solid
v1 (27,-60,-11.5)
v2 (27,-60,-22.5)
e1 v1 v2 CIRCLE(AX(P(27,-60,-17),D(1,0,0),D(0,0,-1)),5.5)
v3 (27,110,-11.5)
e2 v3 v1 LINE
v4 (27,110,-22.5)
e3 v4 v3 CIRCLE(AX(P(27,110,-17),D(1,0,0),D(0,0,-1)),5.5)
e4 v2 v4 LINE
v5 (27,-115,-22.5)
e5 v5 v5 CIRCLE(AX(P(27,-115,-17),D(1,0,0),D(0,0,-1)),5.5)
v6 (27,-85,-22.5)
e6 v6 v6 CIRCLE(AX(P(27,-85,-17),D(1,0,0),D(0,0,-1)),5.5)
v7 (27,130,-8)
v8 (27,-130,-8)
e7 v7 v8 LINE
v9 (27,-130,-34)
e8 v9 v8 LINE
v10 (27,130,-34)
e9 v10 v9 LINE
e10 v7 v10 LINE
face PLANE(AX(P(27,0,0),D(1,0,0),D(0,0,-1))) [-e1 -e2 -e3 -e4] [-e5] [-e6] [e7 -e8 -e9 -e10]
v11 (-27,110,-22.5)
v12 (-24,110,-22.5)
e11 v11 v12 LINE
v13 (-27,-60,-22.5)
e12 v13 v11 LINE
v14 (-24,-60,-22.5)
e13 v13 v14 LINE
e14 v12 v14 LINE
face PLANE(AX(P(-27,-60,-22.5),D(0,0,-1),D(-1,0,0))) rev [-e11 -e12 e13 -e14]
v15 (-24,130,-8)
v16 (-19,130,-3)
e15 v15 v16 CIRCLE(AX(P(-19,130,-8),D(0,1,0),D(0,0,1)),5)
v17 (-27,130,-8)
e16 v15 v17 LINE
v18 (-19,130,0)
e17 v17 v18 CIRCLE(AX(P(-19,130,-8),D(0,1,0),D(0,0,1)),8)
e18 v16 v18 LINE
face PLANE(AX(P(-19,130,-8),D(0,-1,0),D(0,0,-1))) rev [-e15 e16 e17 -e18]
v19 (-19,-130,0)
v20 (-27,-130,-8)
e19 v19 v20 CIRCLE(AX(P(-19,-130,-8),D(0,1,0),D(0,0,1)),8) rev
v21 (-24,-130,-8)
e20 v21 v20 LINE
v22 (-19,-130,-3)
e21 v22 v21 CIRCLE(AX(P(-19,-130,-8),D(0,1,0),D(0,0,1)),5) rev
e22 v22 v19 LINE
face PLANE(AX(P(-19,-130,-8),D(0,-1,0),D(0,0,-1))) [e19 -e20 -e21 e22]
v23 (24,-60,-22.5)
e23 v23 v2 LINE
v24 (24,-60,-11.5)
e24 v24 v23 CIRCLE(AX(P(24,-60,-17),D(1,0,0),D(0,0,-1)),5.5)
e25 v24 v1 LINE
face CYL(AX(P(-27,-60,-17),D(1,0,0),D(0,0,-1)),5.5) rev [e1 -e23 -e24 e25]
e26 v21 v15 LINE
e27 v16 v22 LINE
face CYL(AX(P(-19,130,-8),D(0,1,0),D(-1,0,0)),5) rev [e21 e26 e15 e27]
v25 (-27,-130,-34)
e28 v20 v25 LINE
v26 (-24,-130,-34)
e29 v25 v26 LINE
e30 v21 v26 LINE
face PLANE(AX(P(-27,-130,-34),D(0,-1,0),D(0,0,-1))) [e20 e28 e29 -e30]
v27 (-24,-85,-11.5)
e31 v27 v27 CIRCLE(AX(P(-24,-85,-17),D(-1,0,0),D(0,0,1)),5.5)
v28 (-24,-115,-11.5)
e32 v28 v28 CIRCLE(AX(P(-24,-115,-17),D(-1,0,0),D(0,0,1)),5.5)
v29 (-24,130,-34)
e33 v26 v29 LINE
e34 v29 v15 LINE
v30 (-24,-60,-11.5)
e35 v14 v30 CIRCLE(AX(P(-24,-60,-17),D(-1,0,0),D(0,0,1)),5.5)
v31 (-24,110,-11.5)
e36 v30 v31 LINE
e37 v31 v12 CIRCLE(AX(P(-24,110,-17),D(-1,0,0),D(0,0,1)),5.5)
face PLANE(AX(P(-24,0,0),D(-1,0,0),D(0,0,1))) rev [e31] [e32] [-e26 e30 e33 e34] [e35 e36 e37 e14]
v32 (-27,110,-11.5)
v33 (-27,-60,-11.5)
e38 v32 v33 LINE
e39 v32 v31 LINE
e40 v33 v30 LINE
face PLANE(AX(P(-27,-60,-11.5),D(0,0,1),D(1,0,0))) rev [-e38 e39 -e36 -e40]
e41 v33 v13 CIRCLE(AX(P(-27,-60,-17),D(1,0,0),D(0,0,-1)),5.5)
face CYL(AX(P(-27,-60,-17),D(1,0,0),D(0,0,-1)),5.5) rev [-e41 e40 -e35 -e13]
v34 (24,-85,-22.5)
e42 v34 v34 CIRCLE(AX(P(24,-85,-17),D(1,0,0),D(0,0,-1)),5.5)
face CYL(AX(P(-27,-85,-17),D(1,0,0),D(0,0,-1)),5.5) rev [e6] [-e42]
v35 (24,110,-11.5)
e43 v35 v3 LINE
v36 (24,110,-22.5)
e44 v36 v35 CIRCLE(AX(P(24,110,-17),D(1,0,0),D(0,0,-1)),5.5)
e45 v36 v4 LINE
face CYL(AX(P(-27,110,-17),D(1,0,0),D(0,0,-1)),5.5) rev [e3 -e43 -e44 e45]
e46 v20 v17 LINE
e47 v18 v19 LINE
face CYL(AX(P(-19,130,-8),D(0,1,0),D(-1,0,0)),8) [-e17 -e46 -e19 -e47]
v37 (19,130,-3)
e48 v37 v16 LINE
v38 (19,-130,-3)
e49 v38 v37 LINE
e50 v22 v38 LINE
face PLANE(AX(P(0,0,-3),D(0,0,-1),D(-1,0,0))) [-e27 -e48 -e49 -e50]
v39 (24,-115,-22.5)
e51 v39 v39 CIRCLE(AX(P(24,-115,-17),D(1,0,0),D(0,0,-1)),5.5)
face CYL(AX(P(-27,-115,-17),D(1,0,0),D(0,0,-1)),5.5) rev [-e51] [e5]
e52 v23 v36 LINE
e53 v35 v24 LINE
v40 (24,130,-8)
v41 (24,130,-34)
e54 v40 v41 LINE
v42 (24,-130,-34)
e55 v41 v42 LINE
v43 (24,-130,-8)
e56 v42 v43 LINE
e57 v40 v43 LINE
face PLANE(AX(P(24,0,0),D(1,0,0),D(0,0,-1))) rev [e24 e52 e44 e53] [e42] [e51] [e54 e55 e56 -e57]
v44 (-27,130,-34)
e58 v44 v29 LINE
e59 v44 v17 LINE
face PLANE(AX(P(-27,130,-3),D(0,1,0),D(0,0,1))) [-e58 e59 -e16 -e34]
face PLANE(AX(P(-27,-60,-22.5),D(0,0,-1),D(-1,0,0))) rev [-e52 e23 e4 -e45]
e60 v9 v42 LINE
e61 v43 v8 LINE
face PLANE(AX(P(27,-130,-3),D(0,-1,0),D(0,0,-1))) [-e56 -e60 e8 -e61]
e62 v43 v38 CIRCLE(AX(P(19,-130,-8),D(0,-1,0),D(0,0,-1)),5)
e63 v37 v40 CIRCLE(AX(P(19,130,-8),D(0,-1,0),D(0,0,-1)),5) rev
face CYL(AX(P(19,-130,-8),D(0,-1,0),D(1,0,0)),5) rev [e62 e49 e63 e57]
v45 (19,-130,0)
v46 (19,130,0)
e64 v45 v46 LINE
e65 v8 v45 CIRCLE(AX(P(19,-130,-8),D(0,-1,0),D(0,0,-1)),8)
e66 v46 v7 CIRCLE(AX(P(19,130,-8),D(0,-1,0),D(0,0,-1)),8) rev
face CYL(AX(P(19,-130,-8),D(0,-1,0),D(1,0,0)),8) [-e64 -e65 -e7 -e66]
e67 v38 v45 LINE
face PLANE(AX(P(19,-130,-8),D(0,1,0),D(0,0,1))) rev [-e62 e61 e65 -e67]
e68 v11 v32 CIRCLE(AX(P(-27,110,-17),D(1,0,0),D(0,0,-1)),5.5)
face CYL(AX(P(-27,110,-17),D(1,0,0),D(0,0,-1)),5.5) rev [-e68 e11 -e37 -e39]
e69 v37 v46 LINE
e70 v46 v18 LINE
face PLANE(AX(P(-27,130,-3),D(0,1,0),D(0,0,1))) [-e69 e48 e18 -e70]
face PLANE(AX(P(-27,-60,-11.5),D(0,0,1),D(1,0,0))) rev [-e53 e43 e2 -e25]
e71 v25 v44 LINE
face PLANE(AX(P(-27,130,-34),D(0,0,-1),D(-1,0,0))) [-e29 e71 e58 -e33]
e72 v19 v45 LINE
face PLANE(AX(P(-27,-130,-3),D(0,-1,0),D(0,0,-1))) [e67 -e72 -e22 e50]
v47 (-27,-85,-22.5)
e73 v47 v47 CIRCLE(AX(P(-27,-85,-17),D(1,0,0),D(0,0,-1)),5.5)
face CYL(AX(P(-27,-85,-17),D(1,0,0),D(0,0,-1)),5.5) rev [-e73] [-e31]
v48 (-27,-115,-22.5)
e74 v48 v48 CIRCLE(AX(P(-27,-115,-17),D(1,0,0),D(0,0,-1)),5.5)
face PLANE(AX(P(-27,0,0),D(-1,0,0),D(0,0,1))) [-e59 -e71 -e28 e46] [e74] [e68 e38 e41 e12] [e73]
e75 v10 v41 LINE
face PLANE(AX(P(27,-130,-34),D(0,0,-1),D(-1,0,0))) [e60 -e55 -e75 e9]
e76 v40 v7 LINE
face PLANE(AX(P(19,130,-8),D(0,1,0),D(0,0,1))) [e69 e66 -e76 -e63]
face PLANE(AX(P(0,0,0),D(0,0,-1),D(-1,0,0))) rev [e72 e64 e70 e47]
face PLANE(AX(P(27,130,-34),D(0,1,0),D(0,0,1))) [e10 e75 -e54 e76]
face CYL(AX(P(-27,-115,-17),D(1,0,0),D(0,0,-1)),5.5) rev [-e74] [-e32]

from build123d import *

# Parameters (mm, degrees)
SKETCH1_W                      = 54
SKETCH1_H                      = 260
BASE_FLANGE1_DEPTH             = 3
EDGE_FLANGE1_STRIP_W           = 22
EDGE_FLANGE1_STRIP_H           = 3
EDGE_FLANGE1_STRIP_CUT_DEPTH   = 260
EDGE_FLANGE1_STRIP_2_W         = 22
EDGE_FLANGE1_STRIP_2_H         = 3
EDGE_FLANGE1_STRIP_CUT_2_DEPTH = 260
EDGE_FLANGE1_DEPTH             = 260
EDGE_FLANGE1_BEND_DEPTH        = 260
CUT_EXTRUDE1_DEPTH             = 145.817126059
SKETCH20_R                     = 5.5
CUT_EXTRUDE2_DEPTH             = 145.817126059


# Sheet-metal steps are written as plain solids
with BuildPart() as part:
    # Sketch1 → Base-Flange1 (new body)
    with BuildSketch(Plane.XY):
        Rectangle(SKETCH1_W, SKETCH1_H)
    extrude(amount=-BASE_FLANGE1_DEPTH)

    # Edge-Flange1 strip (across the edge) → Edge-Flange1 strip cut (cut)
    with BuildSketch(Plane(origin=(27, 130, -3), x_dir=(-1, 0, 0), z_dir=(0, -1, 0))):
        with Locations((-3, -1.5)):
            Rectangle(EDGE_FLANGE1_STRIP_W, EDGE_FLANGE1_STRIP_H)
    extrude(amount=EDGE_FLANGE1_STRIP_CUT_DEPTH, mode=Mode.SUBTRACT)

    # Edge-Flange1 strip 2 (across the edge) → Edge-Flange1 strip cut 2 (cut)
    with BuildSketch(Plane(origin=(-27, -130, -3), x_dir=(1, 0, 0), z_dir=(0, 1, 0))):
        with Locations((-3, -1.5)):
            Rectangle(EDGE_FLANGE1_STRIP_2_W, EDGE_FLANGE1_STRIP_2_H)
    extrude(amount=EDGE_FLANGE1_STRIP_CUT_2_DEPTH, mode=Mode.SUBTRACT)

    # Edge-Flange1 section (across the edge) → Edge-Flange1 (add)
    with BuildSketch(Plane(origin=(27, 130, -3), x_dir=(-1, 0, 0), z_dir=(0, -1, 0))):
        with BuildLine():
            Line((0, 5), (0, 31))
            Line((0, 31), (3, 31))
            Line((3, 31), (3, 5))
            ThreePointArc((3, 5), (4.464466094, 1.464466094), (8, 0))
            Line((8, 0), (8, -3))
            ThreePointArc((8, -3), (2.343145751, -0.656854249), (0, 5))
        make_face()
    extrude(amount=EDGE_FLANGE1_DEPTH)

    # Edge-Flange1 section 2 (across the edge) → Edge-Flange1 bend (add)
    with BuildSketch(Plane(origin=(-27, -130, -3), x_dir=(1, 0, 0), z_dir=(0, 1, 0))):
        with BuildLine():
            Line((0, 5), (0, 31))
            Line((0, 31), (3, 31))
            Line((3, 31), (3, 5))
            ThreePointArc((3, 5), (4.464466094, 1.464466094), (8, 0))
            Line((8, 0), (8, -3))
            ThreePointArc((8, -3), (2.343145751, -0.656854249), (0, 5))
        make_face()
    extrude(amount=EDGE_FLANGE1_BEND_DEPTH)

    # Sketch18 → Cut-Extrude1 (cut, through all)
    with BuildSketch(Plane(origin=(27, 0, 0), x_dir=(0, 0, -1), z_dir=(1, 0, 0))):
        with BuildLine():
            Line((11.5, -60), (11.5, 110))
            ThreePointArc((11.5, 110), (17, 115.5), (22.5, 110))
            Line((22.5, 110), (22.5, -60))
            ThreePointArc((22.5, -60), (17, -65.5), (11.5, -60))
        make_face()
    extrude(amount=-CUT_EXTRUDE1_DEPTH, mode=Mode.SUBTRACT)

    # Sketch20 → Cut-Extrude2 (cut, through all)
    with BuildSketch(Plane(origin=(27, 0, 0), x_dir=(0, 0, -1), z_dir=(1, 0, 0))):
        with Locations((17, -115)):
            Circle(SKETCH20_R)
        with Locations((17, -85)):
            Circle(SKETCH20_R)
    extrude(amount=-CUT_EXTRUDE2_DEPTH, mode=Mode.SUBTRACT)


solid = part.part
